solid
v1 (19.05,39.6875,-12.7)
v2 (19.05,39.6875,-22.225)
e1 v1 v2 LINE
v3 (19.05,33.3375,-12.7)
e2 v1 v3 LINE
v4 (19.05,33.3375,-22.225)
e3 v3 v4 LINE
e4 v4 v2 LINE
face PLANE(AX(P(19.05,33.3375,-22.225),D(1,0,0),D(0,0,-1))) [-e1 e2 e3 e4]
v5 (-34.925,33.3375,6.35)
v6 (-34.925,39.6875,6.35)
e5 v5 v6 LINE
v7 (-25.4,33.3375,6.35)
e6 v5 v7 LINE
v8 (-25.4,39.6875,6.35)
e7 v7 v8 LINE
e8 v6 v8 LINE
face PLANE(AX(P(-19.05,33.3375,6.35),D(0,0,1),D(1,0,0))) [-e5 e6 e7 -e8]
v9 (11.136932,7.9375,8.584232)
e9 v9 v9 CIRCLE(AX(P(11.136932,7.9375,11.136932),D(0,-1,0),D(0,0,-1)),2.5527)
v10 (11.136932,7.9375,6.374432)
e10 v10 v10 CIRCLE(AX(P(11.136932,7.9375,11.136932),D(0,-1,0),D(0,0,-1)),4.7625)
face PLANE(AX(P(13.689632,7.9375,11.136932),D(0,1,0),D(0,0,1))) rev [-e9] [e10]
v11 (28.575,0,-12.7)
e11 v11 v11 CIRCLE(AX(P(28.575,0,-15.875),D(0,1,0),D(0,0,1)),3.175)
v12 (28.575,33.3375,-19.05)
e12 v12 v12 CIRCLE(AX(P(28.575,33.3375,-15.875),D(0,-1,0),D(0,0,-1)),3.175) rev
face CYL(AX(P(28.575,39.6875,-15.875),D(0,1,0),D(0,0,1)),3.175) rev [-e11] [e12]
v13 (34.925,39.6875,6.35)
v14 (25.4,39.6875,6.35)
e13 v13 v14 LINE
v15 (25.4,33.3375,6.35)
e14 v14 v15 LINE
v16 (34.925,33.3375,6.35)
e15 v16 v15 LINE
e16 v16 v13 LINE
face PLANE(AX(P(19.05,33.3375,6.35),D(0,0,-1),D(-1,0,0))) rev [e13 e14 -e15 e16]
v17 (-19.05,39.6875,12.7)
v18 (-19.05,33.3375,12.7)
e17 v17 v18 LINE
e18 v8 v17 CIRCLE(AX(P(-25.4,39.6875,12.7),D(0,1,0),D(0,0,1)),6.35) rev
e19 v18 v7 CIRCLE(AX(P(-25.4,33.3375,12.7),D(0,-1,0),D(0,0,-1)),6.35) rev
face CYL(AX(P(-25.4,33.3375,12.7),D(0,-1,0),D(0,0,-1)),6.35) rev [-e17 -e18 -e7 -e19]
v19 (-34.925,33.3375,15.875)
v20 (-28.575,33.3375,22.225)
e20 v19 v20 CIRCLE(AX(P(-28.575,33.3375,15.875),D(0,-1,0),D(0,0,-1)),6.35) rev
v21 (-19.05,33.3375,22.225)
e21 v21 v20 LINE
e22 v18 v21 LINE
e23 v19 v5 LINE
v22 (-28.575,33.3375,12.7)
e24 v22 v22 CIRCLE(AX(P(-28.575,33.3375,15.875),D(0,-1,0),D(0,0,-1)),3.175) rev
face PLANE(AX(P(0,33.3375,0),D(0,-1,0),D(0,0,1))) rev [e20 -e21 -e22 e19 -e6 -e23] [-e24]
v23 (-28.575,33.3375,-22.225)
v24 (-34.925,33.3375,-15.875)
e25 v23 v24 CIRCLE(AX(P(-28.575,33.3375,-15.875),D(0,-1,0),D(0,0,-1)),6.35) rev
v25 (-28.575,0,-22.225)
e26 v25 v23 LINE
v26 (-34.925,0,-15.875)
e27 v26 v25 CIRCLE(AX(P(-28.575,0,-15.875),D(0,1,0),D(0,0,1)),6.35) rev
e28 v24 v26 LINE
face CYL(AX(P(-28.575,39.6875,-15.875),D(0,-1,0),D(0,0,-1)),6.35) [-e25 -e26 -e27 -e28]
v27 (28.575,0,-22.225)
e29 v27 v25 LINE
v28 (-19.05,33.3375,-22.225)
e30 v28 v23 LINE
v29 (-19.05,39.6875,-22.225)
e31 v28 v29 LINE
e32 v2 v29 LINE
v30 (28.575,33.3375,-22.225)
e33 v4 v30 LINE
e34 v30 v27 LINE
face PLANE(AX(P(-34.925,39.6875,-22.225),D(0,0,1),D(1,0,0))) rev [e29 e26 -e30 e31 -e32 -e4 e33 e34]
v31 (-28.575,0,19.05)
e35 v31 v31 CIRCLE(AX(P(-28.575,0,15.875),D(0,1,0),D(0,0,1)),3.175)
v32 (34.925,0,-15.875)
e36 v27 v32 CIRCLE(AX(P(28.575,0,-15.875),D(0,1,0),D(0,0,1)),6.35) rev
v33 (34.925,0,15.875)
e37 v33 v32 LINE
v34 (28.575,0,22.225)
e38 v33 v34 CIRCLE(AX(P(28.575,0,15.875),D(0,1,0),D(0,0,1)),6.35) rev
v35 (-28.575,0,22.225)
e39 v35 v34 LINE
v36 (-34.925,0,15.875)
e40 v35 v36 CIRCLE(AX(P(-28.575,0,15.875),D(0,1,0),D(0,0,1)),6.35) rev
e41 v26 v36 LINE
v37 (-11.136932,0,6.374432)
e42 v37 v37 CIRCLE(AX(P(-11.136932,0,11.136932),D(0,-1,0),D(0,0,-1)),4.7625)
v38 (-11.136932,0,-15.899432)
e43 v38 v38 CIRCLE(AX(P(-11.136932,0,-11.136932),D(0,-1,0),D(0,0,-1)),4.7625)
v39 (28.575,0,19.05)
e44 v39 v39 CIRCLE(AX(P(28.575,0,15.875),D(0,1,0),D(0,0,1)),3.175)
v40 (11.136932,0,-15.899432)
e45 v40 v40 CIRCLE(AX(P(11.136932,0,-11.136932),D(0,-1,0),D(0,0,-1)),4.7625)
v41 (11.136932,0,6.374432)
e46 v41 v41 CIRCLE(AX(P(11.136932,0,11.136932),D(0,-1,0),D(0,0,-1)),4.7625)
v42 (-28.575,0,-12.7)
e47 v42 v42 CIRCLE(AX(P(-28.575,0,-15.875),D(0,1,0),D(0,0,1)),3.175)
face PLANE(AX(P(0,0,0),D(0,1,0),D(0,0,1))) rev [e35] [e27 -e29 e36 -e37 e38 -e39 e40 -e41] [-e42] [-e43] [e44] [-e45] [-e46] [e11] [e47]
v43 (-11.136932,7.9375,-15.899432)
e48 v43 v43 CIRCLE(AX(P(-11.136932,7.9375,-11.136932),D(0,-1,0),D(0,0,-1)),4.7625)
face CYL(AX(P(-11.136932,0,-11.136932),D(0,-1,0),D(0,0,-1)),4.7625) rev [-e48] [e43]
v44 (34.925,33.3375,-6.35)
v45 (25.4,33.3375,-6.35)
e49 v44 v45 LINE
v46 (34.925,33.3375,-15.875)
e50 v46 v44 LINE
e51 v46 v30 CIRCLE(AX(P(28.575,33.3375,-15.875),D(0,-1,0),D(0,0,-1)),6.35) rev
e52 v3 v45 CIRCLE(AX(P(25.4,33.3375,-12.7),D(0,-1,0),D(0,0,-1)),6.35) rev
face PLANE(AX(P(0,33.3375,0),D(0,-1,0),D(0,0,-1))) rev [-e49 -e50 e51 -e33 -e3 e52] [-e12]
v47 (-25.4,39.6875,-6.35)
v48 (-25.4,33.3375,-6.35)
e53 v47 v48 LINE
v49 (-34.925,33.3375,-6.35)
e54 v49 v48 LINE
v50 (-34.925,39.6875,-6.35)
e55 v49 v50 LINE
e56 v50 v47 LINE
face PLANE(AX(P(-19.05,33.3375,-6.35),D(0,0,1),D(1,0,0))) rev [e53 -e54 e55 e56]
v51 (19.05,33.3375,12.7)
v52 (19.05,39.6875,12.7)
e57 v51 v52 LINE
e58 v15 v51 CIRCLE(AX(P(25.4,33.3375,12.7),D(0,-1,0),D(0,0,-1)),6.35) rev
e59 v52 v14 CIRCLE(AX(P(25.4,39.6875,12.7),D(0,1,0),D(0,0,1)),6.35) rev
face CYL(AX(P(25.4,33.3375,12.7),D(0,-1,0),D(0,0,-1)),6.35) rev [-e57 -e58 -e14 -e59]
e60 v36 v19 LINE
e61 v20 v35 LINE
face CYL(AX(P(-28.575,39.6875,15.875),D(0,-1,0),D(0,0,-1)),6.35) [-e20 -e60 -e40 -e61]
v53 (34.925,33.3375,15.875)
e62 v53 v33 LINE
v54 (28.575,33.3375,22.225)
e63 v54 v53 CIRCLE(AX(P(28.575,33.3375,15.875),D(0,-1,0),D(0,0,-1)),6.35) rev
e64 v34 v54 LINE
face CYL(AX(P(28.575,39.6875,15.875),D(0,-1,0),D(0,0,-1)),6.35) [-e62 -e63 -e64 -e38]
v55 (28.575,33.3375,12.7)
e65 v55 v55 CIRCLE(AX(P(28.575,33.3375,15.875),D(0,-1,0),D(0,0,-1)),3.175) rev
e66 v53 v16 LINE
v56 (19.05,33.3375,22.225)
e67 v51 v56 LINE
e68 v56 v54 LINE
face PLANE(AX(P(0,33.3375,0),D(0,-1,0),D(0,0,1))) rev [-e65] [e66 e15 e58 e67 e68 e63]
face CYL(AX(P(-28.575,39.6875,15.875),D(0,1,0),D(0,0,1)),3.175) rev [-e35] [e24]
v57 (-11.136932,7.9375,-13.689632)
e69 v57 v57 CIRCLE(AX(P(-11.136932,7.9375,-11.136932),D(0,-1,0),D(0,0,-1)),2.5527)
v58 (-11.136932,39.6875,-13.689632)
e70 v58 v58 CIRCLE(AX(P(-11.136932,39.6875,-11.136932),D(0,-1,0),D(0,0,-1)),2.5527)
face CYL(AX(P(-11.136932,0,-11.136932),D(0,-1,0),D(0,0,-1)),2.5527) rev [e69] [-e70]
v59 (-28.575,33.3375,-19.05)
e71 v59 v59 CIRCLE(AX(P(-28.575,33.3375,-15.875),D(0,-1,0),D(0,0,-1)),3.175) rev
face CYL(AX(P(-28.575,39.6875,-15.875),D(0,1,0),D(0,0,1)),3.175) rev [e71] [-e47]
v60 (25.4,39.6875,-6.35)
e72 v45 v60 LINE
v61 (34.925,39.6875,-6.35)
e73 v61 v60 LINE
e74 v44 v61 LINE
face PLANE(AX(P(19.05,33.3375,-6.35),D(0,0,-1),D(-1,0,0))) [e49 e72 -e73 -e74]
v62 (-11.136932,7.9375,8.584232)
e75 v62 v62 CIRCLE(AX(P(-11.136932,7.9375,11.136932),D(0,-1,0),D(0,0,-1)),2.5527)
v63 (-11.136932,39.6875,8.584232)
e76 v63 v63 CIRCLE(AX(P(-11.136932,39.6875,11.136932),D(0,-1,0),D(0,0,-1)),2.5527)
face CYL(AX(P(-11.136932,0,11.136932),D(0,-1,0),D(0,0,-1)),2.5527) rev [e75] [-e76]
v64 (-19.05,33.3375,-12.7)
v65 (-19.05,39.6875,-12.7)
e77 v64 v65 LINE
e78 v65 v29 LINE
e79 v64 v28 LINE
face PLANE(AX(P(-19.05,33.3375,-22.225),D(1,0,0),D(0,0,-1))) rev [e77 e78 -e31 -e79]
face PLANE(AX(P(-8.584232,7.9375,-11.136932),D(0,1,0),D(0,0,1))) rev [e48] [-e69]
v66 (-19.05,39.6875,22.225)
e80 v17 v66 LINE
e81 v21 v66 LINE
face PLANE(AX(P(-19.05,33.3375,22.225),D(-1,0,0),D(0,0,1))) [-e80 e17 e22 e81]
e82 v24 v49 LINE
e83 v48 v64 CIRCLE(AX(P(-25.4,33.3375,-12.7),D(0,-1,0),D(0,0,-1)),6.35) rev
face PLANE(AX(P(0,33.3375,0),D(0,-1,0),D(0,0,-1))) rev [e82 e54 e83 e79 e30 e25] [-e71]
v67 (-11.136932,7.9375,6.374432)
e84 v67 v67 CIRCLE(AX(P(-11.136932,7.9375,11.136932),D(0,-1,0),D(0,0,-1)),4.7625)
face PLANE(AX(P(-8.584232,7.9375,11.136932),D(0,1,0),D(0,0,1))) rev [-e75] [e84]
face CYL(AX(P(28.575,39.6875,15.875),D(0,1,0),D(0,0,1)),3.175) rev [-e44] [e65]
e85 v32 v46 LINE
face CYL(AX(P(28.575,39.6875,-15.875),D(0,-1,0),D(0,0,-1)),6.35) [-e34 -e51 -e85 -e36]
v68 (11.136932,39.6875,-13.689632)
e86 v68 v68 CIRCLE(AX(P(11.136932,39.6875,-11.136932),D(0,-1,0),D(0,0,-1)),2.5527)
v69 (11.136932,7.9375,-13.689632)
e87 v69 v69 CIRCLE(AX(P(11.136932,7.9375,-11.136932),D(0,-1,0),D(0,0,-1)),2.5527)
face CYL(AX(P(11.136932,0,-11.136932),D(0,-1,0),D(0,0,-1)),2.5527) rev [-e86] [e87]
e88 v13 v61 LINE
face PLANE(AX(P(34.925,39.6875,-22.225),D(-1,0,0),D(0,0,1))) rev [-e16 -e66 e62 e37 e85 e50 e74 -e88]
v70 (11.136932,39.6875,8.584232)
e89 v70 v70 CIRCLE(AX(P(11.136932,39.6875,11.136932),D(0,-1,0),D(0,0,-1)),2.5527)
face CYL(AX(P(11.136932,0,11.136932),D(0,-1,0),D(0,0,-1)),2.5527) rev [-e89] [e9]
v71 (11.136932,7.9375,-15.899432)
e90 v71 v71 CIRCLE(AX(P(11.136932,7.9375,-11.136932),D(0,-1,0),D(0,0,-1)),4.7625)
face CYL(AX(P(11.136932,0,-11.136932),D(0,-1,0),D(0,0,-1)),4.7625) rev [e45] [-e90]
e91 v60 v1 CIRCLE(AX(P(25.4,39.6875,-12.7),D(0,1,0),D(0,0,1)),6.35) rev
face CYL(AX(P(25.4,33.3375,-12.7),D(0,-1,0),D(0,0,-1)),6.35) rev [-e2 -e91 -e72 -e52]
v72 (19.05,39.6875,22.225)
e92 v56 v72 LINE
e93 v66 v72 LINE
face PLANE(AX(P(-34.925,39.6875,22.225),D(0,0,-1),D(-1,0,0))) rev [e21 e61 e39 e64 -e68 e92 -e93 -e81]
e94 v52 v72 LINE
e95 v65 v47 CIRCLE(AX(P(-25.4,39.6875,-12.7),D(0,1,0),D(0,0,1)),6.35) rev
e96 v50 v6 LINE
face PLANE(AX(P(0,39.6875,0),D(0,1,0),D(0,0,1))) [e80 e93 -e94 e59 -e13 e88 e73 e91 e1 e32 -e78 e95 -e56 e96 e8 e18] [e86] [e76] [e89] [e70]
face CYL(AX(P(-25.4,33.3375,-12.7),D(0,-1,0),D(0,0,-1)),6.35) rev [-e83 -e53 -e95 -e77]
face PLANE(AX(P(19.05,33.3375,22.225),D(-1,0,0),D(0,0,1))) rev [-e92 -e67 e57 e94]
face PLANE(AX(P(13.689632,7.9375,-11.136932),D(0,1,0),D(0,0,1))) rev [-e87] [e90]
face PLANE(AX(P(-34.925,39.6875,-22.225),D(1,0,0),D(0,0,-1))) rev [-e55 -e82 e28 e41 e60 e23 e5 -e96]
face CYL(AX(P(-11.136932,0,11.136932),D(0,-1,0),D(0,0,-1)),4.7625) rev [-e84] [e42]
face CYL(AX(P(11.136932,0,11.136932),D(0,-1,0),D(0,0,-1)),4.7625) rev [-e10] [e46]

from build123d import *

# Parameters (mm, degrees)
SKETCH1_W                                           = 69.85
SKETCH1_H                                           = 44.45
BOSS_EXTRUDE1_DEPTH                                 = 39.6875
CBORE_FOR_10_BINDING_HEAD_MACHINE_SCREW_D           = 5.1054
CBORE_FOR_10_BINDING_HEAD_MACHINE_SCREW_CBORE_D     = 9.525
CBORE_FOR_10_BINDING_HEAD_MACHINE_SCREW_CBORE_DEPTH = 7.9375
FILLET2_R                                           = 6.35
F_1_4_0_25_DIAMETER_HOLE1_D                         = 6.35
SKETCH9_W                                           = 15.875
SKETCH9_H                                           = 15.875
CUT_EXTRUDE1_DEPTH                                  = 6.35
FILLET3_R                                           = 6.35
FILLET3_OF_MIRROR2_R                                = 6.35
MIRROR3_START                                       = 33.3375
MIRROR3_OUTLINE_R                                   = 3.175
MIRROR3_DEPTH                                       = 6.35


# Read off the part's stored shape, not the designer's step: Mirror3
with BuildPart() as part:
    # Sketch1 → Boss-Extrude1 (new body)
    with BuildSketch(Plane(origin=(0, 0, 0), x_dir=(1, 0, 0), z_dir=(0, 1, 0))):
        Rectangle(SKETCH1_W, SKETCH1_H)
    extrude(amount=BOSS_EXTRUDE1_DEPTH)

    # CBORE for #10 Binding Head Machine Screw1 (through all)
    with Locations(Plane(origin=(0, 0, 0), x_dir=(-1, 0, 0), z_dir=(0, -1, 0))):
        with Locations((-11.136931804, 11.136931804), (11.136931804, 11.136931804), (11.136931804, -11.136931804), (-11.136931804, -11.136931804)):
            CounterBoreHole(CBORE_FOR_10_BINDING_HEAD_MACHINE_SCREW_D / 2, CBORE_FOR_10_BINDING_HEAD_MACHINE_SCREW_CBORE_D / 2, CBORE_FOR_10_BINDING_HEAD_MACHINE_SCREW_CBORE_DEPTH)

    # Fillet2
    fillet2_edges = [part.edges().sort_by_distance(p)[0] for p in [
        (34.925, 19.84375, 22.225),
        (-34.925, 19.84375, 22.225),
        (-34.925, 19.84375, -22.225),
        (34.925, 19.84375, -22.225),
    ]]
    fillet(fillet2_edges, radius=FILLET2_R)

    # 1/4 (0.25) Diameter Hole1 (through all)
    with Locations(Plane(origin=(0, 39.6875, 0), x_dir=(-1, 0, 0), z_dir=(0, 1, 0))):
        with Locations((-28.575, -15.875), (-28.575, 15.875), (28.575, 15.875), (28.575, -15.875)):
            f_1_4_0_25_diameter_hole1 = Hole(F_1_4_0_25_DIAMETER_HOLE1_D / 2)

    # Mirror1: 1/4 (0.25) Diameter Hole1 across plane
    add(f_1_4_0_25_diameter_hole1.mirror(Plane(origin=(0, 0, 0), x_dir=(0, 0, 1), z_dir=(1, 0, 0))), mode=Mode.SUBTRACT)

    # Sketch9 → Cut-Extrude1 (cut)
    with BuildSketch(Plane(origin=(0, 39.6875, 0), x_dir=(1, 0, 0), z_dir=(0, 1, 0))):
        with Locations((-26.9875, 14.2875)):
            Rectangle(SKETCH9_W, SKETCH9_H)
    cut_extrude1 = extrude(amount=-CUT_EXTRUDE1_DEPTH, mode=Mode.SUBTRACT)

    # Fillet3
    fillet3_edges = [part.edges().sort_by_distance(p)[0] for p in [
        (-19.05, 36.5125, -6.35),
    ]]
    fillet(fillet3_edges, radius=FILLET3_R)

    # Mirror2: Cut-Extrude1 across plane
    add(cut_extrude1.mirror(Plane.XY), mode=Mode.SUBTRACT)

    # Fillet3 of Mirror2
    fillet3_of_mirror2_edges = [part.edges().sort_by_distance(p)[0] for p in [
        (-19.05, 36.5125, 6.35),
    ]]
    fillet(fillet3_of_mirror2_edges, radius=FILLET3_OF_MIRROR2_R)

    # Mirror3 outline → Mirror3 (cut)
    # profile 1 of 2: a face of its own
    with BuildSketch(Plane(origin=(0, 0, 0), x_dir=(1, 0, 0), z_dir=(0, 1, 0)).offset(MIRROR3_START)):
        with BuildLine():
            Line((25.4, 6.35), (34.925, 6.35))
            Line((34.925, 6.35), (34.925, 15.875))
            ThreePointArc((34.925, 15.875), (33.065128061, 20.365128061), (28.575, 22.225))
            Line((28.575, 22.225), (19.05, 22.225))
            Line((19.05, 22.225), (19.05, 12.7))
            ThreePointArc((19.05, 12.7), (20.909871939, 8.209871939), (25.4, 6.35))
        make_face()
        with Locations((28.575, 15.875)):
            Circle(MIRROR3_OUTLINE_R, mode=Mode.SUBTRACT)
    # profile 2 of 2: a face of its own
    with BuildSketch(Plane(origin=(0, 0, 0), x_dir=(1, 0, 0), z_dir=(0, 1, 0)).offset(MIRROR3_START)):
        with BuildLine():
            Line((34.925, -15.875), (34.925, -6.35))
            Line((34.925, -6.35), (25.4, -6.35))
            ThreePointArc((25.4, -6.35), (20.909871939, -8.209871939), (19.05, -12.7))
            Line((19.05, -12.7), (19.05, -22.225))
            Line((19.05, -22.225), (28.575, -22.225))
            ThreePointArc((28.575, -22.225), (33.065128061, -20.365128061), (34.925, -15.875))
        make_face()
        with Locations((28.575, -15.875)):
            Circle(MIRROR3_OUTLINE_R, mode=Mode.SUBTRACT)
    extrude(amount=MIRROR3_DEPTH, mode=Mode.SUBTRACT)


solid = part.part
